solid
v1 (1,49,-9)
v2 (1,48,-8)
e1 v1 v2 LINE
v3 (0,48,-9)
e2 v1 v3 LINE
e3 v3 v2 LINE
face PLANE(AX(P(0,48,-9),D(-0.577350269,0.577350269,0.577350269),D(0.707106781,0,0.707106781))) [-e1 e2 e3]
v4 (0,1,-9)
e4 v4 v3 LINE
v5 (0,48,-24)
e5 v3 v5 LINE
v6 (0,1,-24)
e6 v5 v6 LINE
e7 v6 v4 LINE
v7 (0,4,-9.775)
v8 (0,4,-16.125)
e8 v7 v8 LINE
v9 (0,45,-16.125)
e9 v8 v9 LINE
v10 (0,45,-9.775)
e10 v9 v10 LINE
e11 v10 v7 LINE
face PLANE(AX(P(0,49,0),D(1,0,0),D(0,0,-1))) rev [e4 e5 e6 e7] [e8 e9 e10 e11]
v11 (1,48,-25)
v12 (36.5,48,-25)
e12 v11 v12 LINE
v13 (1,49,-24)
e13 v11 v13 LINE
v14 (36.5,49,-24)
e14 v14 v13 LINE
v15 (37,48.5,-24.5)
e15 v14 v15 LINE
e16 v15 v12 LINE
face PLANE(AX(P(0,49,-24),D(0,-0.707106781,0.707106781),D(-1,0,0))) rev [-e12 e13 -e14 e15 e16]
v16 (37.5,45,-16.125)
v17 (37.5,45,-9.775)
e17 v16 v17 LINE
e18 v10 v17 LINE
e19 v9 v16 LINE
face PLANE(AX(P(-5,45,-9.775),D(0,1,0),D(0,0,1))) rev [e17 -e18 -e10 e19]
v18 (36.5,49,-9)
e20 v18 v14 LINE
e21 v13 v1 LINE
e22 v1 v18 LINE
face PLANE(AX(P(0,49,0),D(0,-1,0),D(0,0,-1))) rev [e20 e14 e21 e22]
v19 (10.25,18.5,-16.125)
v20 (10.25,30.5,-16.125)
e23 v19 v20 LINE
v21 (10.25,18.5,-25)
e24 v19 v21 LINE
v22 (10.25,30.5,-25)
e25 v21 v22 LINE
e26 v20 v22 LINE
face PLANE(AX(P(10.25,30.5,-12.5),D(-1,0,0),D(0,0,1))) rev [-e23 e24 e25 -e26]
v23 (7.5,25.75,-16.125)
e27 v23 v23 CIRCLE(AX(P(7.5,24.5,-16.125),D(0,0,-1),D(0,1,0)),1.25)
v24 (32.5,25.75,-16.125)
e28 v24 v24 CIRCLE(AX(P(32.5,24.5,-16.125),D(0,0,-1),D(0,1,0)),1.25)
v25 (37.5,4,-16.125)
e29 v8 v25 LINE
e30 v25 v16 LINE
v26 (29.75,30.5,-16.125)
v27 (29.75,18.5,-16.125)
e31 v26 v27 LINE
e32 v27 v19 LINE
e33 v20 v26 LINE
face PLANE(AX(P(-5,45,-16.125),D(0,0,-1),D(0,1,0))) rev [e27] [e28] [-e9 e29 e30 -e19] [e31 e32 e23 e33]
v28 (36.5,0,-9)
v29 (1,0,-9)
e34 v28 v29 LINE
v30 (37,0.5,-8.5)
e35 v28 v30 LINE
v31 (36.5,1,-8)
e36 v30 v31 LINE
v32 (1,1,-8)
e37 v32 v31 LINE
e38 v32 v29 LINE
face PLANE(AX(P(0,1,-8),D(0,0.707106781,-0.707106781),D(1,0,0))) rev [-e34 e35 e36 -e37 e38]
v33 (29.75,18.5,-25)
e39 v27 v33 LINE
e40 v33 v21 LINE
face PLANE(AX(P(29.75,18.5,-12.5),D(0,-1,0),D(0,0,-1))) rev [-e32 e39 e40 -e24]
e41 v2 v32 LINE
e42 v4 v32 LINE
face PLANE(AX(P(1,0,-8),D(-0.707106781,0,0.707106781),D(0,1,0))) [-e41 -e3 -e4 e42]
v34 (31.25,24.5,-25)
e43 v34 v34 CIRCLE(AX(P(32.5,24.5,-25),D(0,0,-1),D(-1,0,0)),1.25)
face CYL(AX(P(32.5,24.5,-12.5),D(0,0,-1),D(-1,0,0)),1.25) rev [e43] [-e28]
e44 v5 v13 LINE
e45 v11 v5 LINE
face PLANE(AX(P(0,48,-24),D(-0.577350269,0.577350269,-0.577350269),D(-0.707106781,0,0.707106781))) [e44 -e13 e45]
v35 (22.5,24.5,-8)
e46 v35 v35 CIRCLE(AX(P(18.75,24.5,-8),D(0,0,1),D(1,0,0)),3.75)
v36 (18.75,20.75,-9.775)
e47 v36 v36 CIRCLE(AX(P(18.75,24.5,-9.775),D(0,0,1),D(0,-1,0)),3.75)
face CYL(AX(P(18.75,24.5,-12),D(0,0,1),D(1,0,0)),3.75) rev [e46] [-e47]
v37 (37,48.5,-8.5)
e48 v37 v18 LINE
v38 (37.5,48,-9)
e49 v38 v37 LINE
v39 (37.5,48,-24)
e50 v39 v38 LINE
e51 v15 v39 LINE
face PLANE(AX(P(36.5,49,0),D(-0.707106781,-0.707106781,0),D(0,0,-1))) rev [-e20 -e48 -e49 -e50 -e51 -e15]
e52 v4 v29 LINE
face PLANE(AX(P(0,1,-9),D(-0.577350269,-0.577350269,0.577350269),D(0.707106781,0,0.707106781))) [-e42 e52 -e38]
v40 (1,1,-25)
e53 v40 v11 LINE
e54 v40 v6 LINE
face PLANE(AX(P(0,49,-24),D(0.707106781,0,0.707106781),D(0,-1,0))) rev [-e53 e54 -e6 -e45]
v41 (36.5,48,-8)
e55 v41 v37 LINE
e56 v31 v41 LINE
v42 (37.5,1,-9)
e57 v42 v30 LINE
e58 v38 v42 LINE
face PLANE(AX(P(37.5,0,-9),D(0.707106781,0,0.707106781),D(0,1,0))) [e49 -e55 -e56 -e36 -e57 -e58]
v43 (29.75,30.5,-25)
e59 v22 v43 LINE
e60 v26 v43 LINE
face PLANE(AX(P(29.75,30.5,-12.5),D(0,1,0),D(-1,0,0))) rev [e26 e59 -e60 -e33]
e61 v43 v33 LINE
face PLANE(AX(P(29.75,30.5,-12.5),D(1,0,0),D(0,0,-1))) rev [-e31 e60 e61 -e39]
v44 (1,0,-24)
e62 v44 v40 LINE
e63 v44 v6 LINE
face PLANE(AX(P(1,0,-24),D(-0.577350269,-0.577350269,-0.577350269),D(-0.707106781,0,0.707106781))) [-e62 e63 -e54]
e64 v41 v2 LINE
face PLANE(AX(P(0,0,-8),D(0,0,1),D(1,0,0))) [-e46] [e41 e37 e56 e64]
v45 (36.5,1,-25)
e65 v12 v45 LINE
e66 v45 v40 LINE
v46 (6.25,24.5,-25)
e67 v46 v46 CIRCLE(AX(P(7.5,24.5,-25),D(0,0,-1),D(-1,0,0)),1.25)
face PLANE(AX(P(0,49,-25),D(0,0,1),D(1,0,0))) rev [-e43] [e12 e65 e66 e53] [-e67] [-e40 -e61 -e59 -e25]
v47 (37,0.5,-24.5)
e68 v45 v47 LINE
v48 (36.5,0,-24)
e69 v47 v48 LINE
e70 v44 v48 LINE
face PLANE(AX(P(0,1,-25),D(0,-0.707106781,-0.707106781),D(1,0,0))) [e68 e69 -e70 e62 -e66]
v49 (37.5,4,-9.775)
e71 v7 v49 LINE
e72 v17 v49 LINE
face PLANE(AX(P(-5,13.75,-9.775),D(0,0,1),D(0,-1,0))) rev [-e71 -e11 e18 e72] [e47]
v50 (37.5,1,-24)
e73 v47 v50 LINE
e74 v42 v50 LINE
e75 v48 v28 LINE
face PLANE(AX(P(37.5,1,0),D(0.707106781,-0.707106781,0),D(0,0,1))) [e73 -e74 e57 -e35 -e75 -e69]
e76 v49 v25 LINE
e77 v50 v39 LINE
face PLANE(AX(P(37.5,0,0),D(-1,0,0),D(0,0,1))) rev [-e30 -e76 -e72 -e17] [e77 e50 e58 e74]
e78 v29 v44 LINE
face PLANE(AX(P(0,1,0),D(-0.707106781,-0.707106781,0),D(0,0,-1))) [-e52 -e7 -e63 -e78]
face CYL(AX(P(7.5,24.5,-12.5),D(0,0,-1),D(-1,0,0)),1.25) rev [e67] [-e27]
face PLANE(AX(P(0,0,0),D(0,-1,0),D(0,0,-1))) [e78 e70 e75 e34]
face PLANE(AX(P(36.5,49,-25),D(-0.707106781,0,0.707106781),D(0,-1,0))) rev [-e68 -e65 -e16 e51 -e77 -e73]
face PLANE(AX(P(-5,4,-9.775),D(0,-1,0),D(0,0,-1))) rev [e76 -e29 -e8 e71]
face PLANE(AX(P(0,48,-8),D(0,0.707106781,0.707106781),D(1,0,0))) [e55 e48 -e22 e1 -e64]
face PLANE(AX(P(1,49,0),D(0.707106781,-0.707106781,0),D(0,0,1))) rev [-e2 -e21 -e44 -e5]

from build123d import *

# Parameters (mm, degrees)
SKETCH1_W           = 50
SKETCH1_H           = 25
BOSS_EXTRUDE1_DEPTH = 49
CUT_EXTRUDE2_DEPTH  = 55
SKETCH5_R           = 1.25
SKETCH5_W           = 19.5
SKETCH5_H           = 12
CUT_EXTRUDE3_DEPTH  = 12.5
SKETCH7_W           = 50
SKETCH7_H           = 49
CUT_EXTRUDE4_DEPTH  = 8
CHAMFER1_SIZE       = 1
SKETCH8_W           = 17.539951448
SKETCH8_H           = 49.569428005
CUT_EXTRUDE5_DEPTH  = 12.5
CHAMFER2_SIZE       = 1
SKETCH9_R           = 3.75
CUT_EXTRUDE6_DEPTH  = 4


with BuildPart() as part:
    # Sketch1 → Boss-Extrude1 (new body)
    with BuildSketch(Plane(origin=(0, 0, 0), x_dir=(1, 0, 0), z_dir=(0, 1, 0))):
        with Locations((25, 12.5)):
            Rectangle(SKETCH1_W, SKETCH1_H)
    extrude(amount=BOSS_EXTRUDE1_DEPTH)

    # Sketch4 → Cut-Extrude2 (cut)
    with BuildSketch(Plane(origin=(50, 0, 0), x_dir=(0, 0, -1), z_dir=(1, 0, 0))):
        Polygon((9.775, 45), (16.125, 45), (16.125, 34.127502784), (16.125, 12.627502784), (16.125, 4), (9.775, 4), (9.775, 13.75), (9.775, 35.25), align=None)
    extrude(amount=-CUT_EXTRUDE2_DEPTH, mode=Mode.SUBTRACT)

    # Sketch5 → Cut-Extrude3 (cut)
    with BuildSketch(Plane(origin=(0, 0, -25), x_dir=(-1, 0, 0), z_dir=(0, 0, -1))):
        with Locations((-32.5, 24.5)):
            Circle(SKETCH5_R)
        with Locations((-7.5, 24.5)):
            Circle(SKETCH5_R)
        with Locations((-20, 24.5)):
            Rectangle(SKETCH5_W, SKETCH5_H)
    extrude(amount=-CUT_EXTRUDE3_DEPTH, mode=Mode.SUBTRACT)

    # Sketch7 → Cut-Extrude4 (cut)
    with BuildSketch(Plane.XY):
        with Locations((25, 24.5)):
            Rectangle(SKETCH7_W, SKETCH7_H)
    extrude(amount=-CUT_EXTRUDE4_DEPTH, mode=Mode.SUBTRACT)

    # Chamfer1
    chamfer1_edges = [part.edges().sort_by_distance(p)[0] for p in [
        (25, 49, -25),
        (0, 49, -16.5),
        (25, 0, -25),
        (0, 0, -16.5),
        (50, 0, -16.5),
        (50, 49, -16.5),
        (0, 24.5, -8),
        (25, 49, -8),
        (50, 24.5, -8),
        (25, 0, -8),
        (0, 24.5, -25),
        (50, 24.5, -25),
    ]]
    chamfer(chamfer1_edges, length=CHAMFER1_SIZE)

    # Sketch8 → Cut-Extrude5 (cut)
    with BuildSketch(Plane(origin=(50, 0, 0), x_dir=(0, 0, -1), z_dir=(1, 0, 0))):
        with Locations((16.404674177, 24.368191016)):
            Rectangle(SKETCH8_W, SKETCH8_H)
    extrude(amount=-CUT_EXTRUDE5_DEPTH, mode=Mode.SUBTRACT)

    # Chamfer2
    # the kernel refuses this chamfer: 1 mm, written as the material it takes off along each edge
    with BuildSketch(Plane(origin=(37.5, 0, -6.428317012), x_dir=(-0.9996219169112968, -0.027495876610586292, 0), z_dir=(0, 0, -1))) as chamfer2_piece_1:
        Polygon((CHAMFER2_SIZE * 0.999621916911, CHAMFER2_SIZE * 0.0274958766106), (-CHAMFER2_SIZE * 0.0274958766106, CHAMFER2_SIZE * 0.999621916911), (0, 0), align=None)
    extrude(amount=20.143365976, mode=Mode.SUBTRACT)
    with BuildSketch(Plane(origin=(37.5, 49, -6.428317012), x_dir=(-0.9996219169112968, 0.027495876610589005, 0), z_dir=(0, 0, -1))) as chamfer2_piece_2:
        Polygon((CHAMFER2_SIZE * 0.999621916911, -CHAMFER2_SIZE * 0.0274958766106), (-CHAMFER2_SIZE * 0.0274958766106, -CHAMFER2_SIZE * 0.999621916911), (0, 0), align=None)
    extrude(amount=20.143365976, mode=Mode.SUBTRACT)
    with BuildSketch(Plane(origin=(37.5, 50.571682988, -8), x_dir=(-0.9996219169112968, 0, 0.027495876610586414), z_dir=(0, -1, 0)), Plane(origin=(37.5, -1.571682988, -25), x_dir=(-0.9996219169112968, 0, -0.02749587661058555), z_dir=(0, 1, 0))) as chamfer2_piece_3:
        Polygon((CHAMFER2_SIZE * 0.999621916911, CHAMFER2_SIZE * 0.0274958766106), (-CHAMFER2_SIZE * 0.0274958766106, CHAMFER2_SIZE * 0.999621916911), (0, 0), align=None)
    extrude(amount=52.143365976, mode=Mode.SUBTRACT)

    # Sketch9 → Cut-Extrude6 (cut)
    with BuildSketch(Plane.XY.offset(-8)):
        with Locations((18.75, 24.5)):
            Circle(SKETCH9_R)
    extrude(amount=-CUT_EXTRUDE6_DEPTH, mode=Mode.SUBTRACT)


solid = part.part
